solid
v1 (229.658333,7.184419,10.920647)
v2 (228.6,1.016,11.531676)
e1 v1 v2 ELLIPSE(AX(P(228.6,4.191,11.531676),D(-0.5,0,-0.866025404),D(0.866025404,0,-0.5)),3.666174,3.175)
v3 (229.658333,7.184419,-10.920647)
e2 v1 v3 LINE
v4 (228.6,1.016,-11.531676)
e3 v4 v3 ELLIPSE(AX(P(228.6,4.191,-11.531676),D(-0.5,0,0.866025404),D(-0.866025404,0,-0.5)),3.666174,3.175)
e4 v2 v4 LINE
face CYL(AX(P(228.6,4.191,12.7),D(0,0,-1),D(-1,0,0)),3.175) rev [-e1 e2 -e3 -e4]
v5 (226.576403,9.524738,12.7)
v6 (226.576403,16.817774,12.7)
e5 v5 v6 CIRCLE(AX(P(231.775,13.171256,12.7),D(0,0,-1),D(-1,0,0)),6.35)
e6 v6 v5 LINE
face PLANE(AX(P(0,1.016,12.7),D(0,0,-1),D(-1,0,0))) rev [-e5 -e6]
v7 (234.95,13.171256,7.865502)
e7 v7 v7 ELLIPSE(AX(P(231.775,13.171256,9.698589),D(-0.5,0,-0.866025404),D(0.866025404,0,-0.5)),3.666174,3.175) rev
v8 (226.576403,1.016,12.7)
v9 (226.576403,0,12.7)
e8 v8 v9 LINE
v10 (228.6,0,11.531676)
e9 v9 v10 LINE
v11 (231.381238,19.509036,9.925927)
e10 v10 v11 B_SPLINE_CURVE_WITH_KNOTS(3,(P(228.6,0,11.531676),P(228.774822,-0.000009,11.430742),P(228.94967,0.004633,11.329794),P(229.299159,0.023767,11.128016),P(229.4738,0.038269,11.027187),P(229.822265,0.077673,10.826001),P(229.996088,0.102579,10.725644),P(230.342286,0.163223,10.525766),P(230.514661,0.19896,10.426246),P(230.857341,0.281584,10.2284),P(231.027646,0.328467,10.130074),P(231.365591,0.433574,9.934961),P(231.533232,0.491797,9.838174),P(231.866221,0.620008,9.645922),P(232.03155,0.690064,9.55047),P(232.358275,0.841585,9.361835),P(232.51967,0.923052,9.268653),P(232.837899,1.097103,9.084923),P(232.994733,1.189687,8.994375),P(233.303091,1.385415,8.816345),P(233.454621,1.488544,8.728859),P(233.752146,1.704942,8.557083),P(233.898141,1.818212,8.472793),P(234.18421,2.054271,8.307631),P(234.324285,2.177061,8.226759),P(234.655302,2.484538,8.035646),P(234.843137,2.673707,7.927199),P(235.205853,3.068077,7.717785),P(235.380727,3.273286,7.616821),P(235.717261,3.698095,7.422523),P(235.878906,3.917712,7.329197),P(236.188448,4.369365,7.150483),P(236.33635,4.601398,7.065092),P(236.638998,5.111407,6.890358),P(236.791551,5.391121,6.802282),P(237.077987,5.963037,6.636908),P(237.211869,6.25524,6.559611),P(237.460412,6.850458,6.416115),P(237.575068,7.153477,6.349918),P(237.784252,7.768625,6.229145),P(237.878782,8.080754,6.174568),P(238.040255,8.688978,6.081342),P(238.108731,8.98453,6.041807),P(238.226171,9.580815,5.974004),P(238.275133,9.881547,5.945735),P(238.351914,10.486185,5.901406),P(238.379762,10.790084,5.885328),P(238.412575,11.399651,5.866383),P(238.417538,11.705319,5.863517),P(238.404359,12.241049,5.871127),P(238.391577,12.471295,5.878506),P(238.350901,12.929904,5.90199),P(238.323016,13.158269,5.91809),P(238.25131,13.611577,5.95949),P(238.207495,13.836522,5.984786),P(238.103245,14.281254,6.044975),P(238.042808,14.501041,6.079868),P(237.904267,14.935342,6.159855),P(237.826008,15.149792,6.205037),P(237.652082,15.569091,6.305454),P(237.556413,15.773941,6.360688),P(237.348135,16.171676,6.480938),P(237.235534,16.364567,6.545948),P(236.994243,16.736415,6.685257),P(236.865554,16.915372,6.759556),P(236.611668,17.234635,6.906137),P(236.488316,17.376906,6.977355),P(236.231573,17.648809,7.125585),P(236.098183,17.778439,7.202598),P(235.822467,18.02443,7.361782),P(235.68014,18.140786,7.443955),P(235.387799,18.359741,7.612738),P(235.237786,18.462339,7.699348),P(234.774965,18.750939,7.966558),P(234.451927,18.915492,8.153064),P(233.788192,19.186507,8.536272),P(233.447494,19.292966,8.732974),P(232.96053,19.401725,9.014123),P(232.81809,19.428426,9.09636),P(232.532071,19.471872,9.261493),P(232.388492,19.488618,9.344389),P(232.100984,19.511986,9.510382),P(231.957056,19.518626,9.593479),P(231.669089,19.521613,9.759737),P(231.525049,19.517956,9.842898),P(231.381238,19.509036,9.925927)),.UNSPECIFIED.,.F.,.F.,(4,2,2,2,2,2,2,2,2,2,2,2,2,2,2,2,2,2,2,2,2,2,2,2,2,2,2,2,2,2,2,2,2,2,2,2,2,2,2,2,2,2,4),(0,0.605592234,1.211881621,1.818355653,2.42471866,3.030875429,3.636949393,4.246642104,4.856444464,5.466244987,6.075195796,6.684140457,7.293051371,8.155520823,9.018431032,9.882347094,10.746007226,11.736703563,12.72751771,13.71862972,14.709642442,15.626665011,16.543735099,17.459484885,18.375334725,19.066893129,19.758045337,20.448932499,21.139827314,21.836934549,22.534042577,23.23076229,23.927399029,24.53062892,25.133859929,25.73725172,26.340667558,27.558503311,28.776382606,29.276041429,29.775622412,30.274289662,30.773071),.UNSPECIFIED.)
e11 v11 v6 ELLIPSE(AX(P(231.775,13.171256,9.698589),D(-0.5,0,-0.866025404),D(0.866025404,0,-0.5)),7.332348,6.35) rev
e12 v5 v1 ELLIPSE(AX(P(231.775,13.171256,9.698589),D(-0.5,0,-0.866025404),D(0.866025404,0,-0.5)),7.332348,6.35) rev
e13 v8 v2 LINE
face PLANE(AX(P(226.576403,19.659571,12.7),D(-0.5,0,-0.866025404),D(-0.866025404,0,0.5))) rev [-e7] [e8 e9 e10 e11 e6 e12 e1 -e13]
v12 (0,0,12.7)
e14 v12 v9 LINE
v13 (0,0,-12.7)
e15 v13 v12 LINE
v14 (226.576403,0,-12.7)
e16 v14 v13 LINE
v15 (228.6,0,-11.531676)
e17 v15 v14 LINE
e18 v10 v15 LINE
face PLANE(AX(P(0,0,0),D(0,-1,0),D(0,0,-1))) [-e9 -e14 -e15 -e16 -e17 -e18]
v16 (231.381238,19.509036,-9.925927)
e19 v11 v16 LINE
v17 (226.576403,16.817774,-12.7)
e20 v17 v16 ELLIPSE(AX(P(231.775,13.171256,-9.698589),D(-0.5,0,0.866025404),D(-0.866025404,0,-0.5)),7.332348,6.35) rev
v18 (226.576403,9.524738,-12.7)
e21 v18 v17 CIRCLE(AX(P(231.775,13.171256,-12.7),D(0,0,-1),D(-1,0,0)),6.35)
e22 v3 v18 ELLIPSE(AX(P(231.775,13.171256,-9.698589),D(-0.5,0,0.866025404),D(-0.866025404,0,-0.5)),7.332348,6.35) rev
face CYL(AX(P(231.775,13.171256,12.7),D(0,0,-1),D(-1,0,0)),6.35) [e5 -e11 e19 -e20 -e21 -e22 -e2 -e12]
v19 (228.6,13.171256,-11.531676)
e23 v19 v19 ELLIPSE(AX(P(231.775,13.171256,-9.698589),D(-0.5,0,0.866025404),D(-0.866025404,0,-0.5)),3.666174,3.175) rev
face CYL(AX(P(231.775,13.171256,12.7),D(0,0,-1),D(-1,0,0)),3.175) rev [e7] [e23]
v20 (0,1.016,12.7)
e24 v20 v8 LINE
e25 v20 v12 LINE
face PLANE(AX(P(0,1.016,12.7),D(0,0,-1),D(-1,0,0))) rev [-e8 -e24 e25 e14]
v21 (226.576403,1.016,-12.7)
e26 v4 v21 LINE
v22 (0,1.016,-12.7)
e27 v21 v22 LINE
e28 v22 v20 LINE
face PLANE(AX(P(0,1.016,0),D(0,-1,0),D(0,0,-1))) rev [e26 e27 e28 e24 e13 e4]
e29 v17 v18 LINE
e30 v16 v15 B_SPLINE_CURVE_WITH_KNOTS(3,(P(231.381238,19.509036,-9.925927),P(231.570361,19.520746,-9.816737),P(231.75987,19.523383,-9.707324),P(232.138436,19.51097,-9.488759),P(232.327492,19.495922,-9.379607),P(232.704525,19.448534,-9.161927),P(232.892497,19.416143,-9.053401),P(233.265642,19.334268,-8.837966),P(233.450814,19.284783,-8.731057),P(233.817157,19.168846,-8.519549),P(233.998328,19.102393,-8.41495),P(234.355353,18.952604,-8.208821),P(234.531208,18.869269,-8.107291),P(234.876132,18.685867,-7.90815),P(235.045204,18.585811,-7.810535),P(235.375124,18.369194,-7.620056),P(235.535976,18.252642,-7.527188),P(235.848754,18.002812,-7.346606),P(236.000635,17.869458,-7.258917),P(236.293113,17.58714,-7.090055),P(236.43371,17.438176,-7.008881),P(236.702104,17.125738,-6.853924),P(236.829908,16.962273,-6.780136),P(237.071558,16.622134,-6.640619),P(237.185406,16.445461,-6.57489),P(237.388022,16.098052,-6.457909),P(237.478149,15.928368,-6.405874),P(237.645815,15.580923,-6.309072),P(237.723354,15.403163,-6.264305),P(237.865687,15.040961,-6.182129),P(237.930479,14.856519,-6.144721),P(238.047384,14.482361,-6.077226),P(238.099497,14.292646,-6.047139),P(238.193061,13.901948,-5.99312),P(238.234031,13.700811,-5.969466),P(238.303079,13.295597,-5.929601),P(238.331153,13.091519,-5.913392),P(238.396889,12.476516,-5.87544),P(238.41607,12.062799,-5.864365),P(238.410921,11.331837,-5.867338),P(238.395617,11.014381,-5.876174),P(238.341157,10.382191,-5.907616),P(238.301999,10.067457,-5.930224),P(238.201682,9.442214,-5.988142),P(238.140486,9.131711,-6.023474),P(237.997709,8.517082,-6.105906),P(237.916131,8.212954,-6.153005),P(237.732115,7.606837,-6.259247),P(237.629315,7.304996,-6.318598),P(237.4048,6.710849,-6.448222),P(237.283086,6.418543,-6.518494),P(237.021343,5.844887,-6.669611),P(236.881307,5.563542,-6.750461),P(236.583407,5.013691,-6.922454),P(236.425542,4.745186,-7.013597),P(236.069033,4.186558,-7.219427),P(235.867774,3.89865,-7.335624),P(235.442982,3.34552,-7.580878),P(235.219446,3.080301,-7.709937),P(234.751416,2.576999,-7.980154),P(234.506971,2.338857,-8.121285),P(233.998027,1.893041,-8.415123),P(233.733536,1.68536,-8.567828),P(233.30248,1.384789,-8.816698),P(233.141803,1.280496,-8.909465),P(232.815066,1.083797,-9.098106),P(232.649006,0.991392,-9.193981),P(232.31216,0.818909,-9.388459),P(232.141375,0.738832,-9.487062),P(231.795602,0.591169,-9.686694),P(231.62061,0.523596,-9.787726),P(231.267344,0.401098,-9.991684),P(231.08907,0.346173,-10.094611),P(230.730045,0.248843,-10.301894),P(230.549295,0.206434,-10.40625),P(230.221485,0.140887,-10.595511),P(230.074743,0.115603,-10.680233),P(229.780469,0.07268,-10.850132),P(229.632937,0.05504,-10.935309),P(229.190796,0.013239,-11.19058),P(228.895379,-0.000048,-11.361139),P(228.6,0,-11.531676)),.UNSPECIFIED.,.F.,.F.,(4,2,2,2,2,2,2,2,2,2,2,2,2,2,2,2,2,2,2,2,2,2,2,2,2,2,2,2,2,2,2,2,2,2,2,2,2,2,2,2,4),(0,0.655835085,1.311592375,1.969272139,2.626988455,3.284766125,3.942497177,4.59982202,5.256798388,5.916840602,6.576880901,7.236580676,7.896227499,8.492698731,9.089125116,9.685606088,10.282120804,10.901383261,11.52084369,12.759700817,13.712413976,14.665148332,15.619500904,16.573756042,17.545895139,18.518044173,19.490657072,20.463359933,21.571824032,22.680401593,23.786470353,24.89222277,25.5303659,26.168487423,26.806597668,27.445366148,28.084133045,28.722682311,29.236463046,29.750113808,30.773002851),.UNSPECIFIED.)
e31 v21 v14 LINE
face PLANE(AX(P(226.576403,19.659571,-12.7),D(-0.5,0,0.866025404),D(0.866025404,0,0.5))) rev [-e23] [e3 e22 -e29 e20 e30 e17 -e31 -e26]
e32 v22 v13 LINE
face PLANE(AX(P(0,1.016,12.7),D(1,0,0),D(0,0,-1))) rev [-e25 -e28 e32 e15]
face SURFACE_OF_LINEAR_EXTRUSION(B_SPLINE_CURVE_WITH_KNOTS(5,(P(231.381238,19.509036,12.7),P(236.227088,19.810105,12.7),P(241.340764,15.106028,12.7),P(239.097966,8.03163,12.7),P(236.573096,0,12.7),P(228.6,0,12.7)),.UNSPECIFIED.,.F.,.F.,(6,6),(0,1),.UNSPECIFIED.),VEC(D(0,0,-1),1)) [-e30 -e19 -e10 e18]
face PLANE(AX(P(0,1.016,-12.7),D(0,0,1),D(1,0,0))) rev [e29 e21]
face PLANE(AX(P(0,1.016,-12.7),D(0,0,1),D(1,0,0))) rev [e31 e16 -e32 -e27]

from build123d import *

# Parameters (mm, degrees)
SKETCH1_W               = 228.6
SKETCH1_H               = 25.4
BOSS_EXTRUDE1_DEPTH     = 1.016
BOSS_EXTRUDE2_START     = -25.4
BOSS_EXTRUDE2_OUTLINE_R = 3.175
BOSS_EXTRUDE2_DEPTH     = 25.4
CUT_EXTRUDE2_DEPTH      = 240.548137597


# Read off the part's stored shape, not the designer's step: Boss-Extrude2
with BuildPart() as part:
    # Sketch1 → Boss-Extrude1 (new body)
    with BuildSketch(Plane(origin=(0, 0, 0), x_dir=(1, 0, 0), z_dir=(0, 1, 0))):
        with Locations((114.3, 0)):
            Rectangle(SKETCH1_W, SKETCH1_H)
    extrude(amount=BOSS_EXTRUDE1_DEPTH)

    # Boss-Extrude2 outline → Boss-Extrude2 (add)
    with BuildSketch(Plane(origin=(0, 0, -12.7), x_dir=(-1, 0, 0), z_dir=(0, 0, -1)).offset(BOSS_EXTRUDE2_START)):
        with BuildLine():
            ThreePointArc((-229.658333333, 7.184418707), (-225.486151946, 14.050397837), (-231.381237899, 19.509035812))
            add(Edge.make_bspline(
                [(-231.381237899, 19.509035812), (-236.227087861, 19.810105296), (-241.340763982, 15.106028372), (-239.097965647, 8.031629833), (-236.573095563, 0), (-228.6, 0)],
                knots=[0, 0, 0, 0, 0, 0, 1, 1, 1, 1, 1, 1], degree=5))
            Line((-228.6, 0), (-228.6, 1.016))
            ThreePointArc((-228.6, 1.016), (-231.729275427, 3.654101218), (-229.658333333, 7.184418707))
        make_face()
        with Locations((-231.775, 13.171256121)):
            Circle(BOSS_EXTRUDE2_OUTLINE_R, mode=Mode.SUBTRACT)
    extrude(amount=BOSS_EXTRUDE2_DEPTH)

    # Sketch3 → Cut-Extrude2 (cut, through all)
    with BuildSketch(Plane.XZ):
        Polygon((226.576403153, 12.7), (238.413448409, 5.865878735), (238.413448409, 12.7), align=None)
        Polygon((226.576403153, -12.7), (238.413448409, -5.865878735), (238.413448409, -12.7), align=None)
    extrude(amount=-CUT_EXTRUDE2_DEPTH, mode=Mode.SUBTRACT)


solid = part.part
